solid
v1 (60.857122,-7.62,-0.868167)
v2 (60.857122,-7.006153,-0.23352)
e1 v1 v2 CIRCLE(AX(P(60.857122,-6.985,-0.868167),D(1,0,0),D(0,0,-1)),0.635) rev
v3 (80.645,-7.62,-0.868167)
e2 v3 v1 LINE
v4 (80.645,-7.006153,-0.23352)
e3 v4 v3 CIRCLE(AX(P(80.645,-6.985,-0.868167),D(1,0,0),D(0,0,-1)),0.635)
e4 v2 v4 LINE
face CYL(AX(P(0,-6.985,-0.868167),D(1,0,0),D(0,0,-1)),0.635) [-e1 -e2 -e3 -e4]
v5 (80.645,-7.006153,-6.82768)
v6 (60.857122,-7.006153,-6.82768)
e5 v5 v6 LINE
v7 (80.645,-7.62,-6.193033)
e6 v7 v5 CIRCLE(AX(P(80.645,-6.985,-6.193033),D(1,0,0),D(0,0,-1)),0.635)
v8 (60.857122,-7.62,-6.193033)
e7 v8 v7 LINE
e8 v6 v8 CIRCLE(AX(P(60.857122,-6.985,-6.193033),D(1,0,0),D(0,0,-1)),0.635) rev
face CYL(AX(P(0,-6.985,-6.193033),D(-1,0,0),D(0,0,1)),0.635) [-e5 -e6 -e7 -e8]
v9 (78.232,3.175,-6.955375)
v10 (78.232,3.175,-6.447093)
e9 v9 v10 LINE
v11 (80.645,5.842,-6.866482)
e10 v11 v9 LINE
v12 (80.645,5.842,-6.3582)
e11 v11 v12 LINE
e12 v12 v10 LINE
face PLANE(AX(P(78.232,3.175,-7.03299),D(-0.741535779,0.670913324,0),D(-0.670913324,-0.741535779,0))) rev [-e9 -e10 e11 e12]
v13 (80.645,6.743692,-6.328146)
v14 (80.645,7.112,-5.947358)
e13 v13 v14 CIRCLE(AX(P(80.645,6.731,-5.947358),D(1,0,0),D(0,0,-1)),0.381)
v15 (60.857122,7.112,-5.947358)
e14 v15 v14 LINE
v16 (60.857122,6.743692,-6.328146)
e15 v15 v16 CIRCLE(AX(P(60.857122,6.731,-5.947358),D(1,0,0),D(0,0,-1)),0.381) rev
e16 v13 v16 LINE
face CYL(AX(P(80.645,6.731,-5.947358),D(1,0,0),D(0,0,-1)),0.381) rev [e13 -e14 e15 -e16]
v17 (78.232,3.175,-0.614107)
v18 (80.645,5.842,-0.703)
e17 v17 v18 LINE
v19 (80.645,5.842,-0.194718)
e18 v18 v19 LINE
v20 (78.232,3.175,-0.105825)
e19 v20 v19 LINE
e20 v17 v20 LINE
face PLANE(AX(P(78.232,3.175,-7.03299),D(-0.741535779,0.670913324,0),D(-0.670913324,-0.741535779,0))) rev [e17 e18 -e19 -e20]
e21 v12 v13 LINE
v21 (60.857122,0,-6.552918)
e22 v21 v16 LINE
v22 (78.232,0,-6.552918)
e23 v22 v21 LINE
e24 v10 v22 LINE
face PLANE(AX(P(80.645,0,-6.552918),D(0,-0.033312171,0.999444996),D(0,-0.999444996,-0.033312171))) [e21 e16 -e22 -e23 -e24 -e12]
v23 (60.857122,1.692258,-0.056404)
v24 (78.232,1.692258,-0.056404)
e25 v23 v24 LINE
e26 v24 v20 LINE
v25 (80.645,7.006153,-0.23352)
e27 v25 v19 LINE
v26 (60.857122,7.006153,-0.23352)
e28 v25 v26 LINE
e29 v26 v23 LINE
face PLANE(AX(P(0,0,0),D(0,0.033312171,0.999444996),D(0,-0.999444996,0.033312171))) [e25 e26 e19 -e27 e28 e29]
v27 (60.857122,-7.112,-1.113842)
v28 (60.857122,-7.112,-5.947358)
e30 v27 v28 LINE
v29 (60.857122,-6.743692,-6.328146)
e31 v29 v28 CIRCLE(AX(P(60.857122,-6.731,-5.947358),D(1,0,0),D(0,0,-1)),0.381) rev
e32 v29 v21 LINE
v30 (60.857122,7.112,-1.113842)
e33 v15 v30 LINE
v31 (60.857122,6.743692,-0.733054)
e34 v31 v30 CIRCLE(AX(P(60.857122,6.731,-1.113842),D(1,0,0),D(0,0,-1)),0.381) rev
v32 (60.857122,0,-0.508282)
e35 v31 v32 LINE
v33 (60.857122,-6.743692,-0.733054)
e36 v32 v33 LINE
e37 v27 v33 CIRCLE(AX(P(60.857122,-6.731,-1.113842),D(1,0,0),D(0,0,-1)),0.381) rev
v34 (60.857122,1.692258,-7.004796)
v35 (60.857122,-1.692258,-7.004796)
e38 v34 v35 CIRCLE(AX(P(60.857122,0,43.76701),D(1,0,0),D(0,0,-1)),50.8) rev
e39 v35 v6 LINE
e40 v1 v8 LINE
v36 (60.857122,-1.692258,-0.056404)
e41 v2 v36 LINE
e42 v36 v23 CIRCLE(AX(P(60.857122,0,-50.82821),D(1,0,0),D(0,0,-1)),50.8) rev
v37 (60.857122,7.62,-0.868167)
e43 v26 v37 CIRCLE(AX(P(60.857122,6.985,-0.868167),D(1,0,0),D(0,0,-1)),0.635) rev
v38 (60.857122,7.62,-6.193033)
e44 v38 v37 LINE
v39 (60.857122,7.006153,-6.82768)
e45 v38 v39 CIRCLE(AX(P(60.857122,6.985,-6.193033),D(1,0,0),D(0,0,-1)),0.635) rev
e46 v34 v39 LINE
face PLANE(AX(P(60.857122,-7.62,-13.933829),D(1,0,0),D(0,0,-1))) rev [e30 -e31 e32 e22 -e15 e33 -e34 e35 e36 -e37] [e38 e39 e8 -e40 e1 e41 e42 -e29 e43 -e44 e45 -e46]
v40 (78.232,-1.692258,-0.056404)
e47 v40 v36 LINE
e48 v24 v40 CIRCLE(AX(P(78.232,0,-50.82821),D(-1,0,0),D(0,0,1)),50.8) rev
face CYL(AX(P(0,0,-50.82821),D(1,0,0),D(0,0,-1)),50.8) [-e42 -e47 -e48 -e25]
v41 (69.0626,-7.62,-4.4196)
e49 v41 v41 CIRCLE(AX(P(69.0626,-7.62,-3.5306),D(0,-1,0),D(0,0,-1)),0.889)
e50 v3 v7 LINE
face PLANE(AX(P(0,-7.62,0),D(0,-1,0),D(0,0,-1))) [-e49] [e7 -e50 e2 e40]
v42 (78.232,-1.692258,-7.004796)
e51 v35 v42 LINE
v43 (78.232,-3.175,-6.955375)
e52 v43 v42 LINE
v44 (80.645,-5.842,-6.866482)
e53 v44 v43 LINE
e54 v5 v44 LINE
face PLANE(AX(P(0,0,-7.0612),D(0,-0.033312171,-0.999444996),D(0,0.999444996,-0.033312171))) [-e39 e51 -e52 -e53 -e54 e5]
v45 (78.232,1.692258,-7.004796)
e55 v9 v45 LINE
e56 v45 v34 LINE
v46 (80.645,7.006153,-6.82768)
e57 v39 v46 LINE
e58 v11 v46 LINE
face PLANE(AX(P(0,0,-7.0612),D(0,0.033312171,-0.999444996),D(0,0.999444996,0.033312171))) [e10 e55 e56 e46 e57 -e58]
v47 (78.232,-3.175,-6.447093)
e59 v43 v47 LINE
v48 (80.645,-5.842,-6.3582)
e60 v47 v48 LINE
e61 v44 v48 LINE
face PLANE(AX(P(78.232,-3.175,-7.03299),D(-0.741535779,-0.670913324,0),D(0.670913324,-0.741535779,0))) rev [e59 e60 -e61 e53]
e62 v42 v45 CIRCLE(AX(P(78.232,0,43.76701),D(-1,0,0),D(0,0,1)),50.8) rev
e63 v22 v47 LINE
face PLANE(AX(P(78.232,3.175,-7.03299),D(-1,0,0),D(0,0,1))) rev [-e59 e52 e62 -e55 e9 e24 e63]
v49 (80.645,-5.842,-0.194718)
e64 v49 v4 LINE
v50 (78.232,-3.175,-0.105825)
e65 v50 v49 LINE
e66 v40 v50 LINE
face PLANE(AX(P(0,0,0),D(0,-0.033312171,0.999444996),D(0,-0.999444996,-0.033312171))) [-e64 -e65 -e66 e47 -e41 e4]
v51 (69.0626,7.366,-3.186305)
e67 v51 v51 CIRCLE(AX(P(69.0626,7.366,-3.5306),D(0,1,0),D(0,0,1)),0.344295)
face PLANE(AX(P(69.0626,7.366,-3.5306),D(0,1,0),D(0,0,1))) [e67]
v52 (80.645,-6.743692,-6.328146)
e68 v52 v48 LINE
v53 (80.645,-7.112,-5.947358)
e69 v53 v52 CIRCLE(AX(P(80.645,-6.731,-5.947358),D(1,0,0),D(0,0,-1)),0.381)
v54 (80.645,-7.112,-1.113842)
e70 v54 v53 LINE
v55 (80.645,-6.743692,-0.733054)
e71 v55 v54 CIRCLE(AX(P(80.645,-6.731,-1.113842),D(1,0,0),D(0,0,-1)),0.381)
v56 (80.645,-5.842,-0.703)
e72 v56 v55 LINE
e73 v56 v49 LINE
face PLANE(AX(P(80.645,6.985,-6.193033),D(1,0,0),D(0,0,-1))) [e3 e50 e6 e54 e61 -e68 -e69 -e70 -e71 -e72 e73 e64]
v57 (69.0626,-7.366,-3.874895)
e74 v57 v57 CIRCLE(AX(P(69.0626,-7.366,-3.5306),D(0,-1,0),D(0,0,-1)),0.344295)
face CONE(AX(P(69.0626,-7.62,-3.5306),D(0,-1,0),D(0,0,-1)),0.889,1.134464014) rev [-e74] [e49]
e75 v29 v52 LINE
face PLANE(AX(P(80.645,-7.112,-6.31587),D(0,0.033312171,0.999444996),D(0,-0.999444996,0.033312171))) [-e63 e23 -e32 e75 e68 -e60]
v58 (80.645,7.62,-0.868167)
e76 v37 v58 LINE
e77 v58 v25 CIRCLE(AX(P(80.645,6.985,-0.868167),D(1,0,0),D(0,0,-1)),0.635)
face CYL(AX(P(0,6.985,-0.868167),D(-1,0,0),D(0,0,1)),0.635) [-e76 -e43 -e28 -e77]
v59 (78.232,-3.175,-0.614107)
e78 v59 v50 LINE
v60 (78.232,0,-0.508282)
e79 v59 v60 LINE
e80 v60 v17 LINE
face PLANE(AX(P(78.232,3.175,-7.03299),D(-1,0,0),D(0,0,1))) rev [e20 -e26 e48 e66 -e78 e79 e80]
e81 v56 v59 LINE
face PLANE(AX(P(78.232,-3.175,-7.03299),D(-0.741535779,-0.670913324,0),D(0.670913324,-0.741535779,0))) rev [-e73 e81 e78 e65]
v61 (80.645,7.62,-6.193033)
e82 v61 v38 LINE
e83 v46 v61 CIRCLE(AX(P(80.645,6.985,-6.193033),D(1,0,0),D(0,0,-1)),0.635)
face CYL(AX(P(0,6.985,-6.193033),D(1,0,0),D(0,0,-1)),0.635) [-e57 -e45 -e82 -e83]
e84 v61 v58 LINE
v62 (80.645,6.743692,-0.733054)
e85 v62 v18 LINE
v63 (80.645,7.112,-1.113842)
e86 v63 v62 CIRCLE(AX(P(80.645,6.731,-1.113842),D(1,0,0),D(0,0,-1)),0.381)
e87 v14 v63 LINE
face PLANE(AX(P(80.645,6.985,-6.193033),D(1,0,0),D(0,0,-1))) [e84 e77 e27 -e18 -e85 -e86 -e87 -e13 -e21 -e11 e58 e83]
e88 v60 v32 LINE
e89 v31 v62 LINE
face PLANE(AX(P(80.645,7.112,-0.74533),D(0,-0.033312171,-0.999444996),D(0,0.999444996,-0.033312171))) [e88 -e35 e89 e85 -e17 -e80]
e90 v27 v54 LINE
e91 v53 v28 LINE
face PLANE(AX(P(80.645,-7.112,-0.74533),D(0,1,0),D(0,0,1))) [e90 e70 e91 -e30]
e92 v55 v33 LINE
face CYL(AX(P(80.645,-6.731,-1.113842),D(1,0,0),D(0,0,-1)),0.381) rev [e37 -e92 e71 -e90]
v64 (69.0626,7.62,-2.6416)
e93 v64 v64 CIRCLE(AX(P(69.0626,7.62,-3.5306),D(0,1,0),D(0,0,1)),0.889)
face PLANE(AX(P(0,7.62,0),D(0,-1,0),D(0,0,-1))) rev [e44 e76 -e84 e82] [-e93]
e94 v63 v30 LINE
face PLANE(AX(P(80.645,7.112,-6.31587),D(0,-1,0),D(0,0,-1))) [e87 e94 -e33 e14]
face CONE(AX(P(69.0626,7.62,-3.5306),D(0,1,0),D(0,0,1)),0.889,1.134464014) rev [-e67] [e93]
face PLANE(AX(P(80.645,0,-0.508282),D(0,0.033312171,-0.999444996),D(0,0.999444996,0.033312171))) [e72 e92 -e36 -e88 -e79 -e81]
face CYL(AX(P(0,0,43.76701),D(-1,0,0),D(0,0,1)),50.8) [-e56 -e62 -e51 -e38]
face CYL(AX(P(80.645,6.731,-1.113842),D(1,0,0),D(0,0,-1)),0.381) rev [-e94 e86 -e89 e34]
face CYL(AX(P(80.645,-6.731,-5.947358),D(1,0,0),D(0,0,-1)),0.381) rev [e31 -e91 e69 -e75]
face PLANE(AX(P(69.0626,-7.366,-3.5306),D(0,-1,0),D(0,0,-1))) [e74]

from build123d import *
from build123d.topology import SkipClean

# Parameters (mm, degrees)
SKETCH1_W                     = 80.645
SKETCH1_H                     = 7.0612
BOSS_EXTRUDE1_DEPTH           = 7.62
BOSS_EXTRUDE1_TAPER           = 1.909
BOSS_EXTRUDE1_OTHER_WAY_DEPTH = 7.62
BOSS_EXTRUDE1_OTHER_WAY_TAPER = 1.909
CUT_EXTRUDE1_DEPTH            = 82.311382902
FILLET2_R                     = 0.635
FILLET3_R                     = 0.381
FILLET4_R                     = 50.8
BOSS_EXTRUDE2_DEPTH           = 80.645
CUT_EXTRUDE2_DEPTH            = 82.308937972
SKETCH7_R                     = 0.635
CUT_EXTRUDE3_DEPTH            = 1.27
SKETCH8_R                     = 0.889
CUT_EXTRUDE4_DEPTH            = 0.254
CUT_EXTRUDE4_DRAFT            = -65
SKETCH9_R                     = 0.889
CUT_EXTRUDE5_DEPTH            = 0.254
CUT_EXTRUDE5_DRAFT            = -65
CUT_EXTRUDE6_START            = 6.175959195
CUT_EXTRUDE6_DEPTH            = 0.881321808
BOSS_EXTRUDE3_REACH           = 83.309
CUT_EXTRUDE7_DEPTH            = 83.373154581
CUT_EXTRUDE7_DEPTH_BACK       = 83.373154581
SKETCH13_W                    = 68.940924303
SKETCH13_H                    = 22.731753013


# Read off the part's stored shape, not the designer's step: Cut-Extrude6
with BuildPart() as part:
    # Sketch1 → Boss-Extrude1 (new body)
    with BuildSketch(Plane(origin=(0, 0, 0), x_dir=(1, 0, 0), z_dir=(0, 1, 0))):
        with Locations((40.3225, 3.5306)):
            Rectangle(SKETCH1_W, SKETCH1_H)
    extrude(amount=BOSS_EXTRUDE1_DEPTH, taper=BOSS_EXTRUDE1_TAPER)

    # Sketch1 → Boss-Extrude1 other way (add)
    with BuildSketch(Plane(origin=(0, 0, 0), x_dir=(1, 0, 0), z_dir=(0, 1, 0))):
        with Locations((40.3225, 3.5306)):
            Rectangle(SKETCH1_W, SKETCH1_H)
    extrude(amount=-BOSS_EXTRUDE1_OTHER_WAY_DEPTH, taper=BOSS_EXTRUDE1_OTHER_WAY_TAPER)

    # Sketch4 → Cut-Extrude1 (cut, through all)
    with BuildSketch(Plane(origin=(0, 0, 0), x_dir=(0, 0, -1), z_dir=(1, 0, 0))):
        Polygon((6.552917901, 0), (6.315870177, 7.112), (0.745329823, 7.112), (0.508282099, 0), (0.745329823, -7.112), (6.315870177, -7.112), align=None)
    extrude(amount=CUT_EXTRUDE1_DEPTH, mode=Mode.SUBTRACT)

    # Fillet2
    fillet2_edges = [part.edges().sort_by_distance(p)[0] for p in [
        (40.3225, -7.62, -6.807220295),
        (40.3225, 7.62, -0.253979705),
        (40.3225, 7.62, -6.807220295),
        (40.3225, -7.62, -0.253979705),
    ]]
    fillet(fillet2_edges, radius=FILLET2_R)

    # Fillet3
    fillet3_edges = [part.edges().sort_by_distance(p)[0] for p in [
        (40.3225, 7.112, -6.315870177),
        (40.3225, 7.112, -0.745329823),
        (40.3225, -7.112, -6.315870177),
        (40.3225, -7.112, -0.745329823),
    ]]
    fillet(fillet3_edges, radius=FILLET3_R)

    # Fillet4
    # the kernel refuses this fillet: 50.8 mm, written as the material it takes off along each edge
    with BuildSketch(Plane(origin=(84.87799508, 0, -7.0612), x_dir=(0, 0.9994449956083129, 0.03331217125165235), z_dir=(-1, 0, 0)), Plane(origin=(-4.23299508, 0, 0), x_dir=(0, 0.999444995608313, -0.03331217125165188), z_dir=(1, 0, 0))) as fillet4_piece_1:
        with BuildLine():
            CenterArc((FILLET4_R * 0.0333306699198, -FILLET4_R), FILLET4_R, 90, 3.818)
            Line((-FILLET4_R * 0.0332566957808, -FILLET4_R * 0.002219401507), (0, 0))
            Line((0, 0), (FILLET4_R * 0.0333306699198, 0))
        make_face()
    extrude(amount=89.11099016, mode=Mode.SUBTRACT)

    # Sketch5 → Boss-Extrude2 (add)
    with SkipClean():  # the faces are left unmerged after this step: merging them gives an invalid solid
        with BuildSketch(Plane(origin=(0, 0, 0), x_dir=(0, 0, -1), z_dir=(1, 0, 0))):
            with BuildLine():
                Line((6.827680219, 7.006153229), (7.004795897, 1.6922583))
                ThreePointArc((7.004795897, 1.6922583), (7.025941075, 0.846246576), (7.03299012, 0))
                ThreePointArc((7.03299012, 0), (7.025941075, -0.846246576), (7.004795897, -1.6922583))
                Line((7.004795897, -1.6922583), (6.827680219, -7.006153229))
                ThreePointArc((6.827680219, -7.006153229), (6.634503314, -7.441430334), (6.193032647, -7.62))
                Line((6.193032647, -7.62), (0.868167353, -7.62))
                ThreePointArc((0.868167353, -7.62), (0.426696686, -7.441430334), (0.233519781, -7.006153229))
                Line((0.233519781, -7.006153229), (0.056404103, -1.6922583))
                ThreePointArc((0.056404103, -1.6922583), (0.035258925, -0.846246576), (0.02820988, 0))
                ThreePointArc((0.02820988, 0), (0.035258925, 0.846246576), (0.056404103, 1.6922583))
                Line((0.056404103, 1.6922583), (0.233519781, 7.006153229))
                ThreePointArc((0.233519781, 7.006153229), (0.426696686, 7.441430334), (0.868167353, 7.62))
                Line((0.868167353, 7.62), (6.193032647, 7.62))
                ThreePointArc((6.193032647, 7.62), (6.634503314, 7.441430334), (6.827680219, 7.006153229))
            make_face()
            with BuildLine():
                Line((6.328146131, 6.743691937), (6.552917901, 0))
                Line((6.552917901, 0), (6.328146131, -6.743691937))
                ThreePointArc((6.328146131, -6.743691937), (6.212239988, -7.004858201), (5.947357588, -7.112))
                Line((5.947357588, -7.112), (1.113842412, -7.112))
                ThreePointArc((1.113842412, -7.112), (0.848960012, -7.004858201), (0.733053869, -6.743691937))
                Line((0.733053869, -6.743691937), (0.508282099, 0))
                Line((0.508282099, 0), (0.733053869, 6.743691937))
                ThreePointArc((0.733053869, 6.743691937), (0.848960012, 7.004858201), (1.113842412, 7.112))
                Line((1.113842412, 7.112), (5.947357588, 7.112))
                ThreePointArc((5.947357588, 7.112), (6.212239988, 7.004858201), (6.328146131, 6.743691937))
            make_face(mode=Mode.SUBTRACT)
        extrude(amount=BOSS_EXTRUDE2_DEPTH)

    # Sketch6 → Cut-Extrude2 (cut, through all)
    with SkipClean():  # the faces are left unmerged after this step: merging them gives an invalid solid
        with BuildSketch(Plane.XY):
            Polygon((80.645, 5.842), (80.645, -5.842), (78.232, -3.175), (78.232, 3.175), align=None)
        extrude(amount=-CUT_EXTRUDE2_DEPTH, mode=Mode.SUBTRACT)

    # Sketch7 → Cut-Extrude3 (cut)
    with SkipClean():  # the faces are left unmerged after this step: merging them gives an invalid solid
        with BuildSketch(Plane.XY):
            with Locations((58.4708, 0)):
                Circle(SKETCH7_R)
        extrude(amount=-CUT_EXTRUDE3_DEPTH, mode=Mode.SUBTRACT)


with BuildPart() as cut_extrude4_tool:
    # Sketch8 → Cut-Extrude4 (with draft: the straight prism first)
    with BuildSketch(Plane(origin=(0, -7.62, 0), x_dir=(-1, 0, 0), z_dir=(0, -1, 0))):
        with Locations((-69.0626, 3.5306)):
            Circle(SKETCH8_R)
    extrude(amount=-CUT_EXTRUDE4_DEPTH)
    # Cut-Extrude4: the draft: its side faces are tilted about the plane it starts from
    cut_extrude4_sides = [cut_extrude4_tool.faces().sort_by_distance(p)[0] for p in [
        (69.9516, -7.493, -3.5306),
    ]]
    draft(cut_extrude4_sides, Plane(origin=(0, -7.62, 0), x_dir=(-1, 0, 0), z_dir=(0, -1, 0)), CUT_EXTRUDE4_DRAFT)


with BuildPart() as part_1:
    add(part.part)

    # Cut-Extrude4: cut by cut_extrude4_tool
    add(cut_extrude4_tool.part, mode=Mode.SUBTRACT)


with BuildPart() as cut_extrude5_tool:
    # Sketch9 → Cut-Extrude5 (with draft: the straight prism first)
    with BuildSketch(Plane(origin=(0, 7.62, 0), x_dir=(1, 0, 0), z_dir=(0, 1, 0))):
        with Locations((69.0626, 3.5306)):
            Circle(SKETCH9_R)
    extrude(amount=-CUT_EXTRUDE5_DEPTH)
    # Cut-Extrude5: the draft: its side faces are tilted about the plane it starts from
    cut_extrude5_sides = [cut_extrude5_tool.faces().sort_by_distance(p)[0] for p in [
        (68.1736, 7.493, -3.5306),
    ]]
    draft(cut_extrude5_sides, Plane(origin=(0, 7.62, 0), x_dir=(1, 0, 0), z_dir=(0, 1, 0)), CUT_EXTRUDE5_DRAFT)


with BuildPart() as part_2:
    add(part_1.part)

    # Cut-Extrude5: cut by cut_extrude5_tool
    add(cut_extrude5_tool.part, mode=Mode.SUBTRACT)

    # Cut-Extrude6 outline → Cut-Extrude6 (cut)
    with SkipClean():  # the faces are left unmerged after this step: merging them gives an invalid solid
        with BuildSketch(Plane(origin=(0, 0, 0), x_dir=(1, 0, 0), z_dir=(0, 0.0333121712516467, -0.9994449956083131)).offset(CUT_EXTRUDE6_START)):
            with BuildLine():
                Line((3.175214283, -5.357453783), (3.810214283, -5.357453783))
                add(Edge.make_bspline(
                    [(3.810214283, -5.357453783), (3.810214283, -4.468947182), (4.699214283, -4.468947182)],
                    knots=[0, 0, 0, 1.570796327, 1.570796327, 1.570796327], degree=2, weights=[1, 0.707106781, 1]))
                Line((4.699214283, -4.468947182), (8.001214283, -4.468947182))
                Line((8.001214283, -4.468947182), (8.001214283, -3.834299609))
                Line((8.001214283, -3.834299609), (4.699214283, -3.834299609))
                add(Edge.make_bspline(
                    [(4.699214283, -3.834299609), (3.175214283, -3.834299609), (3.175214283, -5.357453783)],
                    knots=[3.141592654, 3.141592654, 3.141592654, 4.71238898, 4.71238898, 4.71238898], degree=2, weights=[1, 0.707106781, 1]))
            make_face()
            with BuildLine():
                Line((8.001214283, -2.522694796), (4.699214283, -2.522694796))
                add(Edge.make_bspline(
                    [(4.699214283, -2.522694796), (3.810214283, -2.522694796), (3.810214283, -1.634188195), (3.810214283, -0.745681594), (4.699214283, -0.745681594)],
                    knots=[0, 0, 0, 1.570796327, 1.570796327, 3.141592654, 3.141592654, 3.141592654], degree=2, weights=[1, 0.707106781, 1, 0.707106781, 1]))
                Line((4.699214283, -0.745681594), (8.001214283, -0.745681594))
                Line((8.001214283, -0.745681594), (8.001214283, -0.111034022))
                Line((8.001214283, -0.111034022), (4.699214283, -0.111034022))
                add(Edge.make_bspline(
                    [(4.699214283, -0.111034022), (3.175214283, -0.111034022), (3.175214283, -1.634188195), (3.175214283, -3.157342368), (4.699214283, -3.157342368)],
                    knots=[1.570796327, 1.570796327, 1.570796327, 3.141592654, 3.141592654, 4.71238898, 4.71238898, 4.71238898], degree=2, weights=[1, 0.707106781, 1, 0.707106781, 1]))
                Line((4.699214283, -3.157342368), (8.001214283, -3.157342368))
                Line((8.001214283, -3.157342368), (8.001214283, -2.522694796))
            make_face()
            with BuildLine():
                Line((3.810214283, 5.812343488), (3.175214283, 5.812343488))
                add(Edge.make_bspline(
                    [(3.175214283, 5.812343488), (3.175214283, 4.289189315), (4.699214283, 4.289189315)],
                    knots=[3.141592654, 3.141592654, 3.141592654, 4.71238898, 4.71238898, 4.71238898], degree=2, weights=[1, 0.707106781, 1]))
                Line((4.699214283, 4.289189315), (8.001214283, 4.289189315))
                Line((8.001214283, 4.289189315), (8.001214283, 4.923836887))
                Line((8.001214283, 4.923836887), (4.699214283, 4.923836887))
                add(Edge.make_bspline(
                    [(4.699214283, 4.923836887), (3.810214283, 4.923836887), (3.810214283, 5.812343488)],
                    knots=[1.570796327, 1.570796327, 1.570796327, 3.141592654, 3.141592654, 3.141592654], degree=2, weights=[1, 0.707106781, 1]))
            make_face()
            with BuildLine():
                Line((8.001214283, 3.612232074), (4.699214283, 3.612232074))
                add(Edge.make_bspline(
                    [(4.699214283, 3.612232074), (3.175214283, 3.612232074), (3.175214283, 2.0890779), (3.175214283, 0.565923727), (4.699214283, 0.565923727)],
                    knots=[0, 0, 0, 1.570796327, 1.570796327, 3.141592654, 3.141592654, 3.141592654], degree=2, weights=[1, 0.707106781, 1, 0.707106781, 1]))
                Line((4.699214283, 0.565923727), (8.001214283, 0.565923727))
                Line((8.001214283, 0.565923727), (8.001214283, 1.200571299))
                Line((8.001214283, 1.200571299), (4.699214283, 1.200571299))
                add(Edge.make_bspline(
                    [(4.699214283, 1.200571299), (3.810214283, 1.200571299), (3.810214283, 2.0890779), (3.810214283, 2.977584502), (4.699214283, 2.977584502)],
                    knots=[0, 0, 0, 1.570796327, 1.570796327, 3.141592654, 3.141592654, 3.141592654], degree=2, weights=[1, 0.707106781, 1, 0.707106781, 1]))
                Line((4.699214283, 2.977584502), (8.001214283, 2.977584502))
                Line((8.001214283, 2.977584502), (8.001214283, 3.612232074))
            make_face()
        extrude(amount=CUT_EXTRUDE6_DEPTH, mode=Mode.SUBTRACT)

    # Boss-Extrude3: up to this face of the body (flat: up to its plane)
    boss_extrude3_end = Plane(part_2.part.faces().sort_by_distance((8.001214283, -0.659158971, -6.779580355))[0])
    # Sketch12 → Boss-Extrude3 (add, up to the picked face)
    with BuildSketch(Plane.ZY, mode=Mode.PRIVATE) as boss_extrude3_sk1:
        Polygon((-6.954024091, 1.690566041), (-6.776908414, 7.00446097), (-6.328146131, 6.743691937), (-6.552917901, 0), (-6.328146131, -6.743691937), (-6.776908414, -7.00446097), (-6.954024091, -1.690566041), (-7.01037179, 0), align=None)
    boss_extrude3_tool1 = split(extrude(boss_extrude3_sk1.sketch, amount=-BOSS_EXTRUDE3_REACH, mode=Mode.PRIVATE), bisect_by=boss_extrude3_end, keep=Keep.BOTH, mode=Mode.PRIVATE)
    add(boss_extrude3_tool1.solids().sort_by(Axis((0, 0, -6.668518), (1, 0, 0)))[0])

    # Sketch13 → Cut-Extrude7 (cut, two sides: drawn at the far end of the back side and taken through both)
    with BuildSketch(Plane(origin=(0, 7.62, 0), x_dir=(1, 0, 0), z_dir=(0, 1, 0)).offset(-CUT_EXTRUDE7_DEPTH_BACK)):
        with Locations((26.386659588, 2.567952151)):
            Rectangle(SKETCH13_W, SKETCH13_H)
    extrude(amount=CUT_EXTRUDE7_DEPTH + CUT_EXTRUDE7_DEPTH_BACK, mode=Mode.SUBTRACT)


solid = part_2.part
